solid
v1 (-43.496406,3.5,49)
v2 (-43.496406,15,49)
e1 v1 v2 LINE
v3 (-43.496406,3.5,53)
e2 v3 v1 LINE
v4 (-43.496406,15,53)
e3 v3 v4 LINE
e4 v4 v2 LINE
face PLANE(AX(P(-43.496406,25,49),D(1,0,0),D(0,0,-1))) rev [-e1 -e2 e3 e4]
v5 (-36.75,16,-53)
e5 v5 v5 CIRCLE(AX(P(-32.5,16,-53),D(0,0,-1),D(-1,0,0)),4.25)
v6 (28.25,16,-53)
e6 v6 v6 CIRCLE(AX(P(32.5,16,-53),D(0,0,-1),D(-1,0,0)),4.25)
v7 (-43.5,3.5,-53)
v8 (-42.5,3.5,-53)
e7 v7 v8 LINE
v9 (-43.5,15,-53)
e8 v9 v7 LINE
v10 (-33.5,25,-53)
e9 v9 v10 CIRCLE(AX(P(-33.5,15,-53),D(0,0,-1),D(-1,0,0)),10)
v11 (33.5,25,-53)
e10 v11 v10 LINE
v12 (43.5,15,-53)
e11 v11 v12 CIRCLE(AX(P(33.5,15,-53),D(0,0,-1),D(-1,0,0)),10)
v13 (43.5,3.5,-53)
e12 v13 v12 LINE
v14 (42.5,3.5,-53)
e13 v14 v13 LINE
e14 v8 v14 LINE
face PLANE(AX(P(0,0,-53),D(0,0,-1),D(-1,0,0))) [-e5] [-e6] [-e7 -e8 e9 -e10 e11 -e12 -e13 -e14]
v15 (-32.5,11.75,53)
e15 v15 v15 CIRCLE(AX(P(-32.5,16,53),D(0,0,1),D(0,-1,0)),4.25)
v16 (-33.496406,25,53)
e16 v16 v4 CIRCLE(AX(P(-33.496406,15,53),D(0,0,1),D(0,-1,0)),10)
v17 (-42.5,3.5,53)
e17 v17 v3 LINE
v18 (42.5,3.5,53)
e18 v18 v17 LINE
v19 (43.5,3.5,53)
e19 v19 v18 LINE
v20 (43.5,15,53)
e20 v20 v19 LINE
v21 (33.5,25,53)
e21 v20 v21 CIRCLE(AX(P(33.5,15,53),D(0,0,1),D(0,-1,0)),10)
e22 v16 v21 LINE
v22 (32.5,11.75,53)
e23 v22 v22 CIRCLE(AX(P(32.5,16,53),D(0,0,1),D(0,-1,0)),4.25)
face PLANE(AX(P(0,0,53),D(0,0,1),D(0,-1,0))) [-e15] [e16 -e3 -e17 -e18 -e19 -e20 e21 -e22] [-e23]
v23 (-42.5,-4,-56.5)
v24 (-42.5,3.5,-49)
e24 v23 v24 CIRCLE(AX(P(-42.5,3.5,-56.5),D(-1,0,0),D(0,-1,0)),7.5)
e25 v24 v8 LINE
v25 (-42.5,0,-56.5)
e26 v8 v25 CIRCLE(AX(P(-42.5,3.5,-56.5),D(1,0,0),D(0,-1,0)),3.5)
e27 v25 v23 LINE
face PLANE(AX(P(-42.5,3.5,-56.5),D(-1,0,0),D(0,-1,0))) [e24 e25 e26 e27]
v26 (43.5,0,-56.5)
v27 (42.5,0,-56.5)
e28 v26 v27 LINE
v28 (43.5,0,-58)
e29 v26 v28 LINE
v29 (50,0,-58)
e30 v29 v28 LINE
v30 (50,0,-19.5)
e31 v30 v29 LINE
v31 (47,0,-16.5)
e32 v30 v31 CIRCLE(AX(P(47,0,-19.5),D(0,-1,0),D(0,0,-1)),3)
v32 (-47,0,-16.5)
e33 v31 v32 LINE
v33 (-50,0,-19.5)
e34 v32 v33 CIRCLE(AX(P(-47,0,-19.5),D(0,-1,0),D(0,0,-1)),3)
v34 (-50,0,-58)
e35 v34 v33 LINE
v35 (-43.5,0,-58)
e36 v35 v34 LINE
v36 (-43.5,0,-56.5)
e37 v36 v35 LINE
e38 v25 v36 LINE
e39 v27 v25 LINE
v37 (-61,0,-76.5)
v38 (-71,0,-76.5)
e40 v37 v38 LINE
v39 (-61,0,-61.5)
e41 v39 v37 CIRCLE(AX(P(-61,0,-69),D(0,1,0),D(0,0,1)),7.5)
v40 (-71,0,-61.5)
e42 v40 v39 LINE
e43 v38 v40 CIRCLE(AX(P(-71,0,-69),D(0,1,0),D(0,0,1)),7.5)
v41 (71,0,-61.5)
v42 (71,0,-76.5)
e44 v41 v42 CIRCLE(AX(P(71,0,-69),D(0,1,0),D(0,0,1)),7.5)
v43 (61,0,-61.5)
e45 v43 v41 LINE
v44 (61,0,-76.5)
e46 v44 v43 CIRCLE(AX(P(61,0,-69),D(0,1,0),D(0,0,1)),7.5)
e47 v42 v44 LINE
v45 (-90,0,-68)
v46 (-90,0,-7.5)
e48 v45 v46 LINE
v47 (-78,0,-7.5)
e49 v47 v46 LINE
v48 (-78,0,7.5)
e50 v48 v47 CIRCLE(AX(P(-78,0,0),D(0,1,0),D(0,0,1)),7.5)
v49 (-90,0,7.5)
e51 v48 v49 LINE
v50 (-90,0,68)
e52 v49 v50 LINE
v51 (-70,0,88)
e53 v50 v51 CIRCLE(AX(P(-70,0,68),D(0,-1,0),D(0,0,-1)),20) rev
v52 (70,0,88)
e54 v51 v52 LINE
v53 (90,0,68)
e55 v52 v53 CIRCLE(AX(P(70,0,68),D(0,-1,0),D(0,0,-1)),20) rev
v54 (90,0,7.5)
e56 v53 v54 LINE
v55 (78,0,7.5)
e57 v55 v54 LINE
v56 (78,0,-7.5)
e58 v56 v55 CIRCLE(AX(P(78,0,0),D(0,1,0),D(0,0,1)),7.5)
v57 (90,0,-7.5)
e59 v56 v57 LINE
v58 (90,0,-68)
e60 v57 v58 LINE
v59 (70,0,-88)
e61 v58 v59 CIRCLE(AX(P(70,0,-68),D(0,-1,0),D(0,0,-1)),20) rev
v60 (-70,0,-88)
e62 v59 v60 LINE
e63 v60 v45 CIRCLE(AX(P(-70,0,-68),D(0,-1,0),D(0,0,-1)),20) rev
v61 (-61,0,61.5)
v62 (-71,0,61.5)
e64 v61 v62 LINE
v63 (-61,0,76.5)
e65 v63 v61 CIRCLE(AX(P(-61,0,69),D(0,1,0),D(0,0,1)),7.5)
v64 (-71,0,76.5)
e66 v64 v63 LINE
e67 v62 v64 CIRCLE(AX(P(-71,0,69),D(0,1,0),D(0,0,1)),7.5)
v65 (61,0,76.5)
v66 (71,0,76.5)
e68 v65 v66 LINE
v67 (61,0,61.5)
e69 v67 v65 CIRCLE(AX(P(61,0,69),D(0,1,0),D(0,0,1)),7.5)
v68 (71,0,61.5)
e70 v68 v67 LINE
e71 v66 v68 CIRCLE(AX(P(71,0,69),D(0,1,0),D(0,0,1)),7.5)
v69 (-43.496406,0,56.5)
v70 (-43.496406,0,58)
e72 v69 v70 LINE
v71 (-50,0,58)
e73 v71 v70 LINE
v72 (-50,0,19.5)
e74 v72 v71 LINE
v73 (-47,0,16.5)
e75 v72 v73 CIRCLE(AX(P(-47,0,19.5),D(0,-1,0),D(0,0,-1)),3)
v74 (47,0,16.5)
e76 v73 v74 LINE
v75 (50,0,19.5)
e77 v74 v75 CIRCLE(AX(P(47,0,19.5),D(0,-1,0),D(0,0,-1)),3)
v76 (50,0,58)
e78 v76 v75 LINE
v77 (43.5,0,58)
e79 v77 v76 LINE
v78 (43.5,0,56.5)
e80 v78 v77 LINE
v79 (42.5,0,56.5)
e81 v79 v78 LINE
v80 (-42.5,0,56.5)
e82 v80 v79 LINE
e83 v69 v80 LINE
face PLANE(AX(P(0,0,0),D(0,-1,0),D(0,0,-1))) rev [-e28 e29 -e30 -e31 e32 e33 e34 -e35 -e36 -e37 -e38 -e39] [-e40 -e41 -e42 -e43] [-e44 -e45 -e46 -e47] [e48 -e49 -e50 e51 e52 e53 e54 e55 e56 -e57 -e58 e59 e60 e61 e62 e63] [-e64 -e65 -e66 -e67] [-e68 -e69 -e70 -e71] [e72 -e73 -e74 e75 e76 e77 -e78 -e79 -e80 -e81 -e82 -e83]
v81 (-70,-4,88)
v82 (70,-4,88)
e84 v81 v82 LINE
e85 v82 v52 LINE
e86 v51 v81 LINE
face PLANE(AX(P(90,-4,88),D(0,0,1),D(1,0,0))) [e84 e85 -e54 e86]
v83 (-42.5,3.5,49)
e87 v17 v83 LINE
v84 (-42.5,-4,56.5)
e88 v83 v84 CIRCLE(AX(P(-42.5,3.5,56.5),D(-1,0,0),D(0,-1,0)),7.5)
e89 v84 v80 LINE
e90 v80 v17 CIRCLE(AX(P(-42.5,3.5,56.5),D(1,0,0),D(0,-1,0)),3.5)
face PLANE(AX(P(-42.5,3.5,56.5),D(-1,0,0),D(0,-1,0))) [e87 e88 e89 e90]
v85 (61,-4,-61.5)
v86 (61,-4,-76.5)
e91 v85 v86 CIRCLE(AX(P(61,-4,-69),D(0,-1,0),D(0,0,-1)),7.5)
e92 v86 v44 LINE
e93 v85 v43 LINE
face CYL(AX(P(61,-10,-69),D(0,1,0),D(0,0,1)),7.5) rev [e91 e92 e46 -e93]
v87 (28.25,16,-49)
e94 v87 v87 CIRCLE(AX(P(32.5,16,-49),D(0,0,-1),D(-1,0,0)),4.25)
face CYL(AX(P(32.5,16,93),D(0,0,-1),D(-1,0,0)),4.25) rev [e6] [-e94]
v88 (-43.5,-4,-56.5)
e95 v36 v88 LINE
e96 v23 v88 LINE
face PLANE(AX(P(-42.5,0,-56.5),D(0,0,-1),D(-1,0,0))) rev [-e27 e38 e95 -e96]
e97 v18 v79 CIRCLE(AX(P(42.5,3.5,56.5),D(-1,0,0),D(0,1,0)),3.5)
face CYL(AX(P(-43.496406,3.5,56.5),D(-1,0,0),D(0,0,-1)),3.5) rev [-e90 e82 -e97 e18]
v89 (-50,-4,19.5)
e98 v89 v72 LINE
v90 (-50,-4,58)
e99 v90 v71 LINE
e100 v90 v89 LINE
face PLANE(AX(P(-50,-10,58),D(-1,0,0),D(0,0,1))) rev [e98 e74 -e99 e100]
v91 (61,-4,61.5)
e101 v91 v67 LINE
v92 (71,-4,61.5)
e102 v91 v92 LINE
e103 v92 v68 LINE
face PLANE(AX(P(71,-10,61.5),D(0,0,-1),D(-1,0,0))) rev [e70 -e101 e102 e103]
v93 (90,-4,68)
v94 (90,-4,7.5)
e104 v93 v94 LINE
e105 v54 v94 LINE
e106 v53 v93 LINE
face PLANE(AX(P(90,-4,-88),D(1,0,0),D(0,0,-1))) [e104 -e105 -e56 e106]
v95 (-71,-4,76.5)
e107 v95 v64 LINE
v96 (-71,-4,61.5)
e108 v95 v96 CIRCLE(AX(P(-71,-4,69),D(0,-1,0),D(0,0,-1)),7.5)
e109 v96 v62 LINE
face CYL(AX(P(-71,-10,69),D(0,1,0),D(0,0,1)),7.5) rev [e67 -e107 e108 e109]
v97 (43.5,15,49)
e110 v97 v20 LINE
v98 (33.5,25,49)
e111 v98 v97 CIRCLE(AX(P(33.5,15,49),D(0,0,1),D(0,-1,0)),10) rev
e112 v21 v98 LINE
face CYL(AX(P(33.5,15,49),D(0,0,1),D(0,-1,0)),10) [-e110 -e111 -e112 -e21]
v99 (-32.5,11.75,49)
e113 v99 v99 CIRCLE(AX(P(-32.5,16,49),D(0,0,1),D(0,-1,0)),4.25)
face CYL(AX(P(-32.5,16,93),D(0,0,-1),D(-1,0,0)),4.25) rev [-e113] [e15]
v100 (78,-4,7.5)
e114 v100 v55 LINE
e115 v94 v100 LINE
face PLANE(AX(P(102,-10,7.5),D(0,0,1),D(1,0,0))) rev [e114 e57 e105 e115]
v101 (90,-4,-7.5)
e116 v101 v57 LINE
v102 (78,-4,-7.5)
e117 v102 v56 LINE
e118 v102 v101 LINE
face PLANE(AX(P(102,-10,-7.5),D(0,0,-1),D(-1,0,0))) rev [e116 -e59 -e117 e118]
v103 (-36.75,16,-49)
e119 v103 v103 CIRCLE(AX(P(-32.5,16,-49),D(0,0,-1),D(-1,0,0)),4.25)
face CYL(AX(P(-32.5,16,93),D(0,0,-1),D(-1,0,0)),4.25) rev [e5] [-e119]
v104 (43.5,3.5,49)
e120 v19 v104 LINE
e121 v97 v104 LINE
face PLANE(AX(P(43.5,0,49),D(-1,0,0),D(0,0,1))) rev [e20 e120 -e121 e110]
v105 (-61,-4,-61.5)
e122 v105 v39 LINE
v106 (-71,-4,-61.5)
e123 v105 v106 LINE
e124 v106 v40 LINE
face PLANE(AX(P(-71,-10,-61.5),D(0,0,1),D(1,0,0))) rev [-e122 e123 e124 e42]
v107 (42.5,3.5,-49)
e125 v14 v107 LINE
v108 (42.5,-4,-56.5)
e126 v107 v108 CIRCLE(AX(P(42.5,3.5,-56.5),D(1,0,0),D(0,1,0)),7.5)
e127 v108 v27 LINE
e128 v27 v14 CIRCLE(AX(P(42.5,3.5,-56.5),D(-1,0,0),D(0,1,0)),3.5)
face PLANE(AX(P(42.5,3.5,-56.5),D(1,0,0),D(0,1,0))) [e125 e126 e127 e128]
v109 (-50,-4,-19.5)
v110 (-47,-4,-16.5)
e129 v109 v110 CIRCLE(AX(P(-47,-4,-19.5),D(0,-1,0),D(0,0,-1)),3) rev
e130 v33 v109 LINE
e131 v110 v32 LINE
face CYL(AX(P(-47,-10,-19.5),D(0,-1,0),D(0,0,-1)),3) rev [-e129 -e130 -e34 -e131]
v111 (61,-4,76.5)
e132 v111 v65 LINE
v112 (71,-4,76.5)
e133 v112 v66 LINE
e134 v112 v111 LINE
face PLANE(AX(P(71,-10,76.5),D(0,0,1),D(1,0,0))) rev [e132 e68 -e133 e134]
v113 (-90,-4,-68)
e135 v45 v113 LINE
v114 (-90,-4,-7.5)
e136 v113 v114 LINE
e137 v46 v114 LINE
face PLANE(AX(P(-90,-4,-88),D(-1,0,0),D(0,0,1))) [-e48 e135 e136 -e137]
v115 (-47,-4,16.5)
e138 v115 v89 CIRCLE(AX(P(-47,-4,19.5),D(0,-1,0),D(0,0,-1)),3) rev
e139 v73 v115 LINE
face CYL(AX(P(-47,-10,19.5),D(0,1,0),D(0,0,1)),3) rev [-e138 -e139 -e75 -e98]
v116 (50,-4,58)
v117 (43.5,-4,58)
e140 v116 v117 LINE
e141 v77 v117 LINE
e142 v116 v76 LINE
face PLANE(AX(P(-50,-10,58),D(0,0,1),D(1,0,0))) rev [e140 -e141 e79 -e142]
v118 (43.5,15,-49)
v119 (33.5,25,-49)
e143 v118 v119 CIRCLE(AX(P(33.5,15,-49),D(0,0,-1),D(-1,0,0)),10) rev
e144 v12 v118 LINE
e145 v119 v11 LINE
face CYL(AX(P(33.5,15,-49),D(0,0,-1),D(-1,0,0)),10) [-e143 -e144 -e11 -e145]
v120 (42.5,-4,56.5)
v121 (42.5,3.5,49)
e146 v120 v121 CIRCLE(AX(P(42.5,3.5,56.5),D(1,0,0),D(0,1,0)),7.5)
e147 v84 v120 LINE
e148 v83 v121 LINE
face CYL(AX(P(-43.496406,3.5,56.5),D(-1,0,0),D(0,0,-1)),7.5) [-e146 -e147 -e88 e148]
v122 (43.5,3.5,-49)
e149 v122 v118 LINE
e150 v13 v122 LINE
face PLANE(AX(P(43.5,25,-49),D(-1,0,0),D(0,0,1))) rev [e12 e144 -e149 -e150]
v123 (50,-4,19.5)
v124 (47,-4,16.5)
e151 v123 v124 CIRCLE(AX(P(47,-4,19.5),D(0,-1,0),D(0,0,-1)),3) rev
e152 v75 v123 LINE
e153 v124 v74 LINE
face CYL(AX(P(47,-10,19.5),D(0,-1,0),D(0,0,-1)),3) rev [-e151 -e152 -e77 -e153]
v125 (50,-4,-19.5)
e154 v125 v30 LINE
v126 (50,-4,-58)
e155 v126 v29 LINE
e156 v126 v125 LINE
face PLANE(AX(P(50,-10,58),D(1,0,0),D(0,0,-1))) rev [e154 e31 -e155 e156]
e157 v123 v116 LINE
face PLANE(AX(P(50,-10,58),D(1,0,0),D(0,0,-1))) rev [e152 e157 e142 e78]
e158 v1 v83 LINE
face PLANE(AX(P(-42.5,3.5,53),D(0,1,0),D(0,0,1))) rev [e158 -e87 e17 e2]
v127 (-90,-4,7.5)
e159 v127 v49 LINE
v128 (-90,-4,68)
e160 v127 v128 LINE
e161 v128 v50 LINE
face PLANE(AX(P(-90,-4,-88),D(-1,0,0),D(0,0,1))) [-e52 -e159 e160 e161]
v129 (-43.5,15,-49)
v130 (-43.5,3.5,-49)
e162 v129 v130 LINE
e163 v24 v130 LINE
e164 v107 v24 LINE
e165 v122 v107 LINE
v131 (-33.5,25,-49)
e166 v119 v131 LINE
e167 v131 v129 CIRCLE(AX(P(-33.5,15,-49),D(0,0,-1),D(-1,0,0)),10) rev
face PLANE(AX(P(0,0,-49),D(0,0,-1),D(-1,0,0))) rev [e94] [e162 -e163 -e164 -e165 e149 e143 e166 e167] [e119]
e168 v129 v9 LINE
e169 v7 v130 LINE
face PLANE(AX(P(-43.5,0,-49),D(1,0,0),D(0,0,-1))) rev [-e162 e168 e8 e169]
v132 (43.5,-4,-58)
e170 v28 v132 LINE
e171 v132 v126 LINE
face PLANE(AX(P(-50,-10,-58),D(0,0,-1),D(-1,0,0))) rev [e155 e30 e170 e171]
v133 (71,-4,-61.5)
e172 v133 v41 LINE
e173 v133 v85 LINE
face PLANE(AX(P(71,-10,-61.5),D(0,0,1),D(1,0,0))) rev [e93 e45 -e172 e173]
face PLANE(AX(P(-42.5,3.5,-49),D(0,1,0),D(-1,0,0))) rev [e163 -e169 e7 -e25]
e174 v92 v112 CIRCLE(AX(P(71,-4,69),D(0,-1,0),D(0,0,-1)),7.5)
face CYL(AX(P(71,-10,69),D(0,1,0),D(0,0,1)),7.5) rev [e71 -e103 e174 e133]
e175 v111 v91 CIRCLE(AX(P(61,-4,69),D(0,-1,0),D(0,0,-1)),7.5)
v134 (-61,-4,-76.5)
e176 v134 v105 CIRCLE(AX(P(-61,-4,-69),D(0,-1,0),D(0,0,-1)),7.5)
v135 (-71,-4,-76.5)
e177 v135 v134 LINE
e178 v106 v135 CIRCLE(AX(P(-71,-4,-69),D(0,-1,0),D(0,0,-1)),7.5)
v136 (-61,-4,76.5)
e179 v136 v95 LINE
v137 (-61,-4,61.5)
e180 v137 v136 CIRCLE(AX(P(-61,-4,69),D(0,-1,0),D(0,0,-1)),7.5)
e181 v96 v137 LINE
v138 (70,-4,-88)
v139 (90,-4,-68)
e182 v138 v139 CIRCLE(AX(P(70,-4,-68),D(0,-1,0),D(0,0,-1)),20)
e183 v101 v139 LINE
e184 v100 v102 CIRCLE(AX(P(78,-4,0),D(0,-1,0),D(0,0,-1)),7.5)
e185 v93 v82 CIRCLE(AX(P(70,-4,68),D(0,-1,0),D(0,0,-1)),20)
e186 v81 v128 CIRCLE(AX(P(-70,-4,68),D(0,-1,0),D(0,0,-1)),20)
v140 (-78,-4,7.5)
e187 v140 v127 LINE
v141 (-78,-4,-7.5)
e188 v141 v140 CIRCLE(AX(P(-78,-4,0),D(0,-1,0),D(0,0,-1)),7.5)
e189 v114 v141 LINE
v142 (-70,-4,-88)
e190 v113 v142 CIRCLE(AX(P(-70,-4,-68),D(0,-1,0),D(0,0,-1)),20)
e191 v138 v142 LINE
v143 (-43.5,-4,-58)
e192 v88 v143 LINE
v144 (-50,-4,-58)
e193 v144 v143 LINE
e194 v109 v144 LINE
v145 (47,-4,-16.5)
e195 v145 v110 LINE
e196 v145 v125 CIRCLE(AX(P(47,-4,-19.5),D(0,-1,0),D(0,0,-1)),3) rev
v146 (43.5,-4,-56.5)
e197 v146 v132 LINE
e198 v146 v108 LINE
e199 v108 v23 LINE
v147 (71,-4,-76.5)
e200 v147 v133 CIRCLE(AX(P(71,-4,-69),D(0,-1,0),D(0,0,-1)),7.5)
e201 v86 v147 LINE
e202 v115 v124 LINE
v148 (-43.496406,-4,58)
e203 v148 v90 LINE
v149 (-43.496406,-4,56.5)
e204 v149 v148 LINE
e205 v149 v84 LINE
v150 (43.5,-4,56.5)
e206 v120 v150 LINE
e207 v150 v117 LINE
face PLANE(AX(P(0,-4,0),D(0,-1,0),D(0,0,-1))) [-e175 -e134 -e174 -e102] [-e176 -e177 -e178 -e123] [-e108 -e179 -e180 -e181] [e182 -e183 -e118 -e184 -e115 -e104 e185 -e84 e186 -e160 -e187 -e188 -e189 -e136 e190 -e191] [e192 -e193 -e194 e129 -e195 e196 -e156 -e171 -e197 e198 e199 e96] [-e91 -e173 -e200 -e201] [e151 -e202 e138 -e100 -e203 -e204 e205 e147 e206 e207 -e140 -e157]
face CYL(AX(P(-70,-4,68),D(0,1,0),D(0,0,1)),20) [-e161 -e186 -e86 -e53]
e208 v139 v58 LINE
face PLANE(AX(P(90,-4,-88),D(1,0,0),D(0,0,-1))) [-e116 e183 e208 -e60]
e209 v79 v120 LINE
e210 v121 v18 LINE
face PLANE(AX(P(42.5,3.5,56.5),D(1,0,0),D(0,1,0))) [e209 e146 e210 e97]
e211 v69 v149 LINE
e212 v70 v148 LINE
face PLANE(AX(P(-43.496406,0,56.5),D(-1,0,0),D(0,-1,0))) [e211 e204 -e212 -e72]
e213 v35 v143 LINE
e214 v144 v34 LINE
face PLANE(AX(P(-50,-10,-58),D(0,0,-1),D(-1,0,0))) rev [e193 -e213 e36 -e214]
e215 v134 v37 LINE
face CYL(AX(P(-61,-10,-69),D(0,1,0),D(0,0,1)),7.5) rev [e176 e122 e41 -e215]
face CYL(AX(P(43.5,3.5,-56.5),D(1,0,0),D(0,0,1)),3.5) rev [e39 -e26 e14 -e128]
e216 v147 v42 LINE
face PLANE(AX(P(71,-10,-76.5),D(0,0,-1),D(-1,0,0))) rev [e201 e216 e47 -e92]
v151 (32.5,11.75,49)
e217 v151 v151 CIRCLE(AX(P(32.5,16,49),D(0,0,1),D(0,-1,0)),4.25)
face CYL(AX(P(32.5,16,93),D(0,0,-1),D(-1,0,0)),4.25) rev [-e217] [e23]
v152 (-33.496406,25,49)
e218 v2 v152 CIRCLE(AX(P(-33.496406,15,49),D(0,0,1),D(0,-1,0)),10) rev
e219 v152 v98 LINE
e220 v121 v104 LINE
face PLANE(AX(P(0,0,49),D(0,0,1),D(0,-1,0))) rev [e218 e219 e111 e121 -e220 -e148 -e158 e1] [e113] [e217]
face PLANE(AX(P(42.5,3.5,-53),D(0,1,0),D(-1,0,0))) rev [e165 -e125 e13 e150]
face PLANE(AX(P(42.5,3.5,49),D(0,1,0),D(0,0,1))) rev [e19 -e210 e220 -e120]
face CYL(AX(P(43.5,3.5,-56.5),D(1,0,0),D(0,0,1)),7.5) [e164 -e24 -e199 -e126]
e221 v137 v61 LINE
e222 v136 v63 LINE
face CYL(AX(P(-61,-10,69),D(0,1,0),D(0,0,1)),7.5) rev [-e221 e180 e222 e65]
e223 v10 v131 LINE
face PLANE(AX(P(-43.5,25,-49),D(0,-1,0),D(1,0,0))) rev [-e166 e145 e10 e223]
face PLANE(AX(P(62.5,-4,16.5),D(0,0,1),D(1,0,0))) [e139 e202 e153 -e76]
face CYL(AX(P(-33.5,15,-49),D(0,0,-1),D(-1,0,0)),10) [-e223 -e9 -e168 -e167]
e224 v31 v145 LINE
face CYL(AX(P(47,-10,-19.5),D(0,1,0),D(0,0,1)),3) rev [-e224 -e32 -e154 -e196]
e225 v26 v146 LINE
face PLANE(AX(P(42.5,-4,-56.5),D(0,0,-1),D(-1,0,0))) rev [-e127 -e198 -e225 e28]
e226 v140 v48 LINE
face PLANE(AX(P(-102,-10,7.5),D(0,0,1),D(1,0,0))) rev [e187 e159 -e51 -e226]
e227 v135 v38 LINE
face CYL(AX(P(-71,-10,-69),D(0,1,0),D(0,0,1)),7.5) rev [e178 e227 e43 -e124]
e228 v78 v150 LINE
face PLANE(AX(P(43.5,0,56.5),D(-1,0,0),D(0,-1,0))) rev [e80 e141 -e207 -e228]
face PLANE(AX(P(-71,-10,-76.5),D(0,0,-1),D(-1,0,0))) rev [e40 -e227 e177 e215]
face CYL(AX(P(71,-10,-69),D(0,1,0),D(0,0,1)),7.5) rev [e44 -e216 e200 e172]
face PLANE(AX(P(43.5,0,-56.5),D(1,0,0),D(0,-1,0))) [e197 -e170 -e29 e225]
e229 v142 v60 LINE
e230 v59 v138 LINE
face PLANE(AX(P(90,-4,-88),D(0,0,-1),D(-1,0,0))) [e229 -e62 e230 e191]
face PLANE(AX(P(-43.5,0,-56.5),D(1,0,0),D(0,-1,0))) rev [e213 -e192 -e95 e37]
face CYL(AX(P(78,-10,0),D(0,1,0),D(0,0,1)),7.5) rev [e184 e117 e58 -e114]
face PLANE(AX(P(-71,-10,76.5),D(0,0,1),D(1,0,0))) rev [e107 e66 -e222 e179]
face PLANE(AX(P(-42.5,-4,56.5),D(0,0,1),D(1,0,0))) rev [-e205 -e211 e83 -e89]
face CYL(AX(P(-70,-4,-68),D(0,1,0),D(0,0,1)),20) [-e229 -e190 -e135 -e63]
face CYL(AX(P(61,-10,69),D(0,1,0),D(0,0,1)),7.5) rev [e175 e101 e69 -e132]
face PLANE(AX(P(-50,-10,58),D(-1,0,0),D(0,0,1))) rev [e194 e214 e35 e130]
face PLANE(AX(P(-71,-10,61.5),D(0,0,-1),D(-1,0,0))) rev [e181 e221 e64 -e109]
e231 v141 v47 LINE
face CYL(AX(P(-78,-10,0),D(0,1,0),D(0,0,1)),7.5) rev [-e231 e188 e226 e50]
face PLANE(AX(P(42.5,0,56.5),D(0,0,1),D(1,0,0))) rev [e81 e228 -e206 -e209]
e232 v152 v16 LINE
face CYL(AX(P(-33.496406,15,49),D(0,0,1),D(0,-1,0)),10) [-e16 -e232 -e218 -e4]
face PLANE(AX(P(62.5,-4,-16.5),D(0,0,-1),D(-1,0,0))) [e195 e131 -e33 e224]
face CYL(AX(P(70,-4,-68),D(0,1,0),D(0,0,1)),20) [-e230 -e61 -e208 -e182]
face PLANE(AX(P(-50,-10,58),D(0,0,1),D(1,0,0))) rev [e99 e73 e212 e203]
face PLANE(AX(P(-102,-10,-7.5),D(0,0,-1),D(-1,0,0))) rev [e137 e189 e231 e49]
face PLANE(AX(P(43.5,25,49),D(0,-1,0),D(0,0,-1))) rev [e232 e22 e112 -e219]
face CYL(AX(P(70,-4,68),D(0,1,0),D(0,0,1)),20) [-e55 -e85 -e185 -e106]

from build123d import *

# Parameters (mm, degrees)
IZIM1_W                 = 180
IZIM1_H                 = 176
TABAN_FLAN_1_DEPTH      = 4
RADYUS1_R               = 20
KES_EKSTR_ZYON1_DEPTH   = 10
IZIM7_W                 = 100
IZIM7_H                 = 116
KES_EKSTR_ZYON2_DEPTH   = 10
KENAR_FLAN_1_DEPTH      = 86.996406433
KENAR_FLAN_1_BEND_DEPTH = 87
IZIM14_R                = 4.25
KES_EKSTR_ZYON3_DEPTH   = 146
RADYUS2_R               = 10
IZIM15_W                = 125
IZIM15_H                = 33
SEKME1_DEPTH            = 4
RADYUS3_R               = 3
KES_EKSTR_ZYON4_DEPTH   = 1
KES_EKSTR_ZYON5_DEPTH   = 1
KES_EKSTR_ZYON6_DEPTH   = 10


# Sheet-metal steps are written as plain solids
with BuildPart() as part:
    # Çizim1 → Taban-Flanş1 (new body)
    with BuildSketch(Plane(origin=(0, 0, 0), x_dir=(1, 0, 0), z_dir=(0, 1, 0))):
        Rectangle(IZIM1_W, IZIM1_H)
    extrude(amount=-TABAN_FLAN_1_DEPTH)

    # Radyus1
    radyus1_edges = [part.edges().sort_by_distance(p)[0] for p in [
        (-90, -2, -88),
        (90, -2, -88),
        (90, -2, 88),
        (-90, -2, 88),
    ]]
    fillet(radyus1_edges, radius=RADYUS1_R)

    # Çizim6 → Kes-Ekstrüzyon1 (cut)
    with BuildSketch(Plane(origin=(0, 0, 0), x_dir=(1, 0, 0), z_dir=(0, 1, 0))):
        with BuildLine():
            Line((-71, -61.5), (-61, -61.5))
            ThreePointArc((-61, -61.5), (-53.5, -69), (-61, -76.5))
            Line((-61, -76.5), (-71, -76.5))
            ThreePointArc((-71, -76.5), (-78.5, -69), (-71, -61.5))
        make_face()
        with BuildLine():
            Line((-71, 76.5), (-61, 76.5))
            ThreePointArc((-61, 76.5), (-53.5, 69), (-61, 61.5))
            Line((-61, 61.5), (-71, 61.5))
            ThreePointArc((-71, 61.5), (-78.5, 69), (-71, 76.5))
        make_face()
        with BuildLine():
            Line((71, 61.5), (61, 61.5))
            ThreePointArc((61, 61.5), (53.5, 69), (61, 76.5))
            Line((61, 76.5), (71, 76.5))
            ThreePointArc((71, 76.5), (78.5, 69), (71, 61.5))
        make_face()
        with BuildLine():
            Line((71, -76.5), (61, -76.5))
            ThreePointArc((61, -76.5), (53.5, -69), (61, -61.5))
            Line((61, -61.5), (71, -61.5))
            ThreePointArc((71, -61.5), (78.5, -69), (71, -76.5))
        make_face()
    extrude(amount=-KES_EKSTR_ZYON1_DEPTH, mode=Mode.SUBTRACT)

    # Çizim7 → Kes-Ekstrüzyon2 (cut)
    with BuildSketch(Plane(origin=(0, 0, 0), x_dir=(1, 0, 0), z_dir=(0, 1, 0))):
        Rectangle(IZIM7_W, IZIM7_H)
    extrude(amount=-KES_EKSTR_ZYON2_DEPTH, mode=Mode.SUBTRACT)

    # Kenar-Flanş1 section (across the edge) → Kenar-Flanş1 (add)
    with BuildSketch(Plane(origin=(43.5, 0, 53), x_dir=(0, 0, 1), z_dir=(-1, 0, 0))):
        with BuildLine():
            Line((-4, 3.5), (-4, 25))
            Line((-4, 25), (0, 25))
            Line((0, 25), (0, 3.5))
            ThreePointArc((0, 3.5), (1.025126266, 1.025126266), (3.5, 0))
            Line((3.5, 0), (5, 0))
            Line((5, 0), (5, -4))
            Line((5, -4), (3.5, -4))
            ThreePointArc((3.5, -4), (-1.803300859, -1.803300859), (-4, 3.5))
        make_face()
    extrude(amount=KENAR_FLAN_1_DEPTH)

    # Kenar-Flanş1 section 2 (across the edge) → Kenar-Flanş1 bend (add)
    with BuildSketch(Plane(origin=(-43.5, 0, -53), x_dir=(0, 0, -1), z_dir=(1, 0, 0))):
        with BuildLine():
            Line((-4, 3.5), (-4, 25))
            Line((-4, 25), (0, 25))
            Line((0, 25), (0, 3.5))
            ThreePointArc((0, 3.5), (1.025126266, 1.025126266), (3.5, 0))
            Line((3.5, 0), (5, 0))
            Line((5, 0), (5, -4))
            Line((5, -4), (3.5, -4))
            ThreePointArc((3.5, -4), (-1.803300859, -1.803300859), (-4, 3.5))
        make_face()
    extrude(amount=KENAR_FLAN_1_BEND_DEPTH)

    # Çizim14 → Kes-Ekstrüzyon3 (cut)
    with BuildSketch(Plane(origin=(0, 0, -53), x_dir=(-1, 0, 0), z_dir=(0, 0, -1))):
        with Locations((-32.5, 16)):
            Circle(IZIM14_R)
        with Locations((32.5, 16)):
            Circle(IZIM14_R)
    extrude(amount=-KES_EKSTR_ZYON3_DEPTH, mode=Mode.SUBTRACT)

    # Radyus2
    radyus2_edges = [part.edges().sort_by_distance(p)[0] for p in [
        (43.5, 25, 51),
        (-43.496406433, 25, 51),
        (-43.5, 25, -51),
        (43.5, 25, -51),
    ]]
    fillet(radyus2_edges, radius=RADYUS2_R)

    # Çizim15 → Sekme1 (add)
    with BuildSketch(Plane(origin=(0, 0, 0), x_dir=(1, 0, 0), z_dir=(0, 1, 0))):
        Rectangle(IZIM15_W, IZIM15_H)
    extrude(amount=-SEKME1_DEPTH)

    # Radyus3
    radyus3_edges = [part.edges().sort_by_distance(p)[0] for p in [
        (-50, -2, 16.5),
        (-50, -2, -16.5),
        (50, -2, -16.5),
        (50, -2, 16.5),
    ]]
    fillet(radyus3_edges, radius=RADYUS3_R)

    # Çizim18 → Kes-Ekstrüzyon4 (cut)
    with BuildSketch(Plane(origin=(43.5, 0, 0), x_dir=(0, 0, -1), z_dir=(1, 0, 0))):
        with BuildLine():
            Line((53, 3.5), (49, 3.5))
            ThreePointArc((49, 3.5), (51.196699141, -1.803300859), (56.5, -4))
            Line((56.5, -4), (56.5, 0))
            ThreePointArc((56.5, 0), (54.025126266, 1.025126266), (53, 3.5))
        make_face()
        with BuildLine():
            Line((-49, 3.5), (-53, 3.5))
            ThreePointArc((-53, 3.5), (-54.025126266, 1.025126266), (-56.5, 0))
            Line((-56.5, 0), (-56.5, -4))
            ThreePointArc((-56.5, -4), (-51.196699141, -1.803300859), (-49, 3.5))
        make_face()
    extrude(amount=-KES_EKSTR_ZYON4_DEPTH, mode=Mode.SUBTRACT)

    # Çizim19 → Kes-Ekstrüzyon5 (cut)
    with BuildSketch(Plane.ZY.offset(43.5)):
        with BuildLine():
            Line((-49, 3.5), (-53, 3.5))
            ThreePointArc((-53, 3.5), (-54.025126266, 1.025126266), (-56.5, 0))
            Line((-56.5, 0), (-56.5, -4))
            ThreePointArc((-56.5, -4), (-51.196699141, -1.803300859), (-49, 3.5))
        make_face()
        with BuildLine():
            Line((53, 3.5), (49, 3.5))
            ThreePointArc((49, 3.5), (51.196699141, -1.803300859), (56.5, -4))
            Line((56.5, -4), (56.5, 0))
            ThreePointArc((56.5, 0), (54.025126266, 1.025126266), (53, 3.5))
        make_face()
    extrude(amount=-KES_EKSTR_ZYON5_DEPTH, mode=Mode.SUBTRACT)

    # Çizim20 → Kes-Ekstrüzyon6 (cut)
    with BuildSketch(Plane(origin=(0, 0, 0), x_dir=(1, 0, 0), z_dir=(0, 1, 0))):
        with BuildLine():
            Line((102, -7.5), (78, -7.5))
            ThreePointArc((78, -7.5), (70.5, 0), (78, 7.5))
            Line((78, 7.5), (102, 7.5))
            ThreePointArc((102, 7.5), (109.5, 0), (102, -7.5))
        make_face()
        with BuildLine():
            Line((-102, 7.5), (-78, 7.5))
            ThreePointArc((-78, 7.5), (-70.5, 0), (-78, -7.5))
            Line((-78, -7.5), (-102, -7.5))
            ThreePointArc((-102, -7.5), (-109.5, 0), (-102, 7.5))
        make_face()
    extrude(amount=-KES_EKSTR_ZYON6_DEPTH, mode=Mode.SUBTRACT)


solid = part.part
